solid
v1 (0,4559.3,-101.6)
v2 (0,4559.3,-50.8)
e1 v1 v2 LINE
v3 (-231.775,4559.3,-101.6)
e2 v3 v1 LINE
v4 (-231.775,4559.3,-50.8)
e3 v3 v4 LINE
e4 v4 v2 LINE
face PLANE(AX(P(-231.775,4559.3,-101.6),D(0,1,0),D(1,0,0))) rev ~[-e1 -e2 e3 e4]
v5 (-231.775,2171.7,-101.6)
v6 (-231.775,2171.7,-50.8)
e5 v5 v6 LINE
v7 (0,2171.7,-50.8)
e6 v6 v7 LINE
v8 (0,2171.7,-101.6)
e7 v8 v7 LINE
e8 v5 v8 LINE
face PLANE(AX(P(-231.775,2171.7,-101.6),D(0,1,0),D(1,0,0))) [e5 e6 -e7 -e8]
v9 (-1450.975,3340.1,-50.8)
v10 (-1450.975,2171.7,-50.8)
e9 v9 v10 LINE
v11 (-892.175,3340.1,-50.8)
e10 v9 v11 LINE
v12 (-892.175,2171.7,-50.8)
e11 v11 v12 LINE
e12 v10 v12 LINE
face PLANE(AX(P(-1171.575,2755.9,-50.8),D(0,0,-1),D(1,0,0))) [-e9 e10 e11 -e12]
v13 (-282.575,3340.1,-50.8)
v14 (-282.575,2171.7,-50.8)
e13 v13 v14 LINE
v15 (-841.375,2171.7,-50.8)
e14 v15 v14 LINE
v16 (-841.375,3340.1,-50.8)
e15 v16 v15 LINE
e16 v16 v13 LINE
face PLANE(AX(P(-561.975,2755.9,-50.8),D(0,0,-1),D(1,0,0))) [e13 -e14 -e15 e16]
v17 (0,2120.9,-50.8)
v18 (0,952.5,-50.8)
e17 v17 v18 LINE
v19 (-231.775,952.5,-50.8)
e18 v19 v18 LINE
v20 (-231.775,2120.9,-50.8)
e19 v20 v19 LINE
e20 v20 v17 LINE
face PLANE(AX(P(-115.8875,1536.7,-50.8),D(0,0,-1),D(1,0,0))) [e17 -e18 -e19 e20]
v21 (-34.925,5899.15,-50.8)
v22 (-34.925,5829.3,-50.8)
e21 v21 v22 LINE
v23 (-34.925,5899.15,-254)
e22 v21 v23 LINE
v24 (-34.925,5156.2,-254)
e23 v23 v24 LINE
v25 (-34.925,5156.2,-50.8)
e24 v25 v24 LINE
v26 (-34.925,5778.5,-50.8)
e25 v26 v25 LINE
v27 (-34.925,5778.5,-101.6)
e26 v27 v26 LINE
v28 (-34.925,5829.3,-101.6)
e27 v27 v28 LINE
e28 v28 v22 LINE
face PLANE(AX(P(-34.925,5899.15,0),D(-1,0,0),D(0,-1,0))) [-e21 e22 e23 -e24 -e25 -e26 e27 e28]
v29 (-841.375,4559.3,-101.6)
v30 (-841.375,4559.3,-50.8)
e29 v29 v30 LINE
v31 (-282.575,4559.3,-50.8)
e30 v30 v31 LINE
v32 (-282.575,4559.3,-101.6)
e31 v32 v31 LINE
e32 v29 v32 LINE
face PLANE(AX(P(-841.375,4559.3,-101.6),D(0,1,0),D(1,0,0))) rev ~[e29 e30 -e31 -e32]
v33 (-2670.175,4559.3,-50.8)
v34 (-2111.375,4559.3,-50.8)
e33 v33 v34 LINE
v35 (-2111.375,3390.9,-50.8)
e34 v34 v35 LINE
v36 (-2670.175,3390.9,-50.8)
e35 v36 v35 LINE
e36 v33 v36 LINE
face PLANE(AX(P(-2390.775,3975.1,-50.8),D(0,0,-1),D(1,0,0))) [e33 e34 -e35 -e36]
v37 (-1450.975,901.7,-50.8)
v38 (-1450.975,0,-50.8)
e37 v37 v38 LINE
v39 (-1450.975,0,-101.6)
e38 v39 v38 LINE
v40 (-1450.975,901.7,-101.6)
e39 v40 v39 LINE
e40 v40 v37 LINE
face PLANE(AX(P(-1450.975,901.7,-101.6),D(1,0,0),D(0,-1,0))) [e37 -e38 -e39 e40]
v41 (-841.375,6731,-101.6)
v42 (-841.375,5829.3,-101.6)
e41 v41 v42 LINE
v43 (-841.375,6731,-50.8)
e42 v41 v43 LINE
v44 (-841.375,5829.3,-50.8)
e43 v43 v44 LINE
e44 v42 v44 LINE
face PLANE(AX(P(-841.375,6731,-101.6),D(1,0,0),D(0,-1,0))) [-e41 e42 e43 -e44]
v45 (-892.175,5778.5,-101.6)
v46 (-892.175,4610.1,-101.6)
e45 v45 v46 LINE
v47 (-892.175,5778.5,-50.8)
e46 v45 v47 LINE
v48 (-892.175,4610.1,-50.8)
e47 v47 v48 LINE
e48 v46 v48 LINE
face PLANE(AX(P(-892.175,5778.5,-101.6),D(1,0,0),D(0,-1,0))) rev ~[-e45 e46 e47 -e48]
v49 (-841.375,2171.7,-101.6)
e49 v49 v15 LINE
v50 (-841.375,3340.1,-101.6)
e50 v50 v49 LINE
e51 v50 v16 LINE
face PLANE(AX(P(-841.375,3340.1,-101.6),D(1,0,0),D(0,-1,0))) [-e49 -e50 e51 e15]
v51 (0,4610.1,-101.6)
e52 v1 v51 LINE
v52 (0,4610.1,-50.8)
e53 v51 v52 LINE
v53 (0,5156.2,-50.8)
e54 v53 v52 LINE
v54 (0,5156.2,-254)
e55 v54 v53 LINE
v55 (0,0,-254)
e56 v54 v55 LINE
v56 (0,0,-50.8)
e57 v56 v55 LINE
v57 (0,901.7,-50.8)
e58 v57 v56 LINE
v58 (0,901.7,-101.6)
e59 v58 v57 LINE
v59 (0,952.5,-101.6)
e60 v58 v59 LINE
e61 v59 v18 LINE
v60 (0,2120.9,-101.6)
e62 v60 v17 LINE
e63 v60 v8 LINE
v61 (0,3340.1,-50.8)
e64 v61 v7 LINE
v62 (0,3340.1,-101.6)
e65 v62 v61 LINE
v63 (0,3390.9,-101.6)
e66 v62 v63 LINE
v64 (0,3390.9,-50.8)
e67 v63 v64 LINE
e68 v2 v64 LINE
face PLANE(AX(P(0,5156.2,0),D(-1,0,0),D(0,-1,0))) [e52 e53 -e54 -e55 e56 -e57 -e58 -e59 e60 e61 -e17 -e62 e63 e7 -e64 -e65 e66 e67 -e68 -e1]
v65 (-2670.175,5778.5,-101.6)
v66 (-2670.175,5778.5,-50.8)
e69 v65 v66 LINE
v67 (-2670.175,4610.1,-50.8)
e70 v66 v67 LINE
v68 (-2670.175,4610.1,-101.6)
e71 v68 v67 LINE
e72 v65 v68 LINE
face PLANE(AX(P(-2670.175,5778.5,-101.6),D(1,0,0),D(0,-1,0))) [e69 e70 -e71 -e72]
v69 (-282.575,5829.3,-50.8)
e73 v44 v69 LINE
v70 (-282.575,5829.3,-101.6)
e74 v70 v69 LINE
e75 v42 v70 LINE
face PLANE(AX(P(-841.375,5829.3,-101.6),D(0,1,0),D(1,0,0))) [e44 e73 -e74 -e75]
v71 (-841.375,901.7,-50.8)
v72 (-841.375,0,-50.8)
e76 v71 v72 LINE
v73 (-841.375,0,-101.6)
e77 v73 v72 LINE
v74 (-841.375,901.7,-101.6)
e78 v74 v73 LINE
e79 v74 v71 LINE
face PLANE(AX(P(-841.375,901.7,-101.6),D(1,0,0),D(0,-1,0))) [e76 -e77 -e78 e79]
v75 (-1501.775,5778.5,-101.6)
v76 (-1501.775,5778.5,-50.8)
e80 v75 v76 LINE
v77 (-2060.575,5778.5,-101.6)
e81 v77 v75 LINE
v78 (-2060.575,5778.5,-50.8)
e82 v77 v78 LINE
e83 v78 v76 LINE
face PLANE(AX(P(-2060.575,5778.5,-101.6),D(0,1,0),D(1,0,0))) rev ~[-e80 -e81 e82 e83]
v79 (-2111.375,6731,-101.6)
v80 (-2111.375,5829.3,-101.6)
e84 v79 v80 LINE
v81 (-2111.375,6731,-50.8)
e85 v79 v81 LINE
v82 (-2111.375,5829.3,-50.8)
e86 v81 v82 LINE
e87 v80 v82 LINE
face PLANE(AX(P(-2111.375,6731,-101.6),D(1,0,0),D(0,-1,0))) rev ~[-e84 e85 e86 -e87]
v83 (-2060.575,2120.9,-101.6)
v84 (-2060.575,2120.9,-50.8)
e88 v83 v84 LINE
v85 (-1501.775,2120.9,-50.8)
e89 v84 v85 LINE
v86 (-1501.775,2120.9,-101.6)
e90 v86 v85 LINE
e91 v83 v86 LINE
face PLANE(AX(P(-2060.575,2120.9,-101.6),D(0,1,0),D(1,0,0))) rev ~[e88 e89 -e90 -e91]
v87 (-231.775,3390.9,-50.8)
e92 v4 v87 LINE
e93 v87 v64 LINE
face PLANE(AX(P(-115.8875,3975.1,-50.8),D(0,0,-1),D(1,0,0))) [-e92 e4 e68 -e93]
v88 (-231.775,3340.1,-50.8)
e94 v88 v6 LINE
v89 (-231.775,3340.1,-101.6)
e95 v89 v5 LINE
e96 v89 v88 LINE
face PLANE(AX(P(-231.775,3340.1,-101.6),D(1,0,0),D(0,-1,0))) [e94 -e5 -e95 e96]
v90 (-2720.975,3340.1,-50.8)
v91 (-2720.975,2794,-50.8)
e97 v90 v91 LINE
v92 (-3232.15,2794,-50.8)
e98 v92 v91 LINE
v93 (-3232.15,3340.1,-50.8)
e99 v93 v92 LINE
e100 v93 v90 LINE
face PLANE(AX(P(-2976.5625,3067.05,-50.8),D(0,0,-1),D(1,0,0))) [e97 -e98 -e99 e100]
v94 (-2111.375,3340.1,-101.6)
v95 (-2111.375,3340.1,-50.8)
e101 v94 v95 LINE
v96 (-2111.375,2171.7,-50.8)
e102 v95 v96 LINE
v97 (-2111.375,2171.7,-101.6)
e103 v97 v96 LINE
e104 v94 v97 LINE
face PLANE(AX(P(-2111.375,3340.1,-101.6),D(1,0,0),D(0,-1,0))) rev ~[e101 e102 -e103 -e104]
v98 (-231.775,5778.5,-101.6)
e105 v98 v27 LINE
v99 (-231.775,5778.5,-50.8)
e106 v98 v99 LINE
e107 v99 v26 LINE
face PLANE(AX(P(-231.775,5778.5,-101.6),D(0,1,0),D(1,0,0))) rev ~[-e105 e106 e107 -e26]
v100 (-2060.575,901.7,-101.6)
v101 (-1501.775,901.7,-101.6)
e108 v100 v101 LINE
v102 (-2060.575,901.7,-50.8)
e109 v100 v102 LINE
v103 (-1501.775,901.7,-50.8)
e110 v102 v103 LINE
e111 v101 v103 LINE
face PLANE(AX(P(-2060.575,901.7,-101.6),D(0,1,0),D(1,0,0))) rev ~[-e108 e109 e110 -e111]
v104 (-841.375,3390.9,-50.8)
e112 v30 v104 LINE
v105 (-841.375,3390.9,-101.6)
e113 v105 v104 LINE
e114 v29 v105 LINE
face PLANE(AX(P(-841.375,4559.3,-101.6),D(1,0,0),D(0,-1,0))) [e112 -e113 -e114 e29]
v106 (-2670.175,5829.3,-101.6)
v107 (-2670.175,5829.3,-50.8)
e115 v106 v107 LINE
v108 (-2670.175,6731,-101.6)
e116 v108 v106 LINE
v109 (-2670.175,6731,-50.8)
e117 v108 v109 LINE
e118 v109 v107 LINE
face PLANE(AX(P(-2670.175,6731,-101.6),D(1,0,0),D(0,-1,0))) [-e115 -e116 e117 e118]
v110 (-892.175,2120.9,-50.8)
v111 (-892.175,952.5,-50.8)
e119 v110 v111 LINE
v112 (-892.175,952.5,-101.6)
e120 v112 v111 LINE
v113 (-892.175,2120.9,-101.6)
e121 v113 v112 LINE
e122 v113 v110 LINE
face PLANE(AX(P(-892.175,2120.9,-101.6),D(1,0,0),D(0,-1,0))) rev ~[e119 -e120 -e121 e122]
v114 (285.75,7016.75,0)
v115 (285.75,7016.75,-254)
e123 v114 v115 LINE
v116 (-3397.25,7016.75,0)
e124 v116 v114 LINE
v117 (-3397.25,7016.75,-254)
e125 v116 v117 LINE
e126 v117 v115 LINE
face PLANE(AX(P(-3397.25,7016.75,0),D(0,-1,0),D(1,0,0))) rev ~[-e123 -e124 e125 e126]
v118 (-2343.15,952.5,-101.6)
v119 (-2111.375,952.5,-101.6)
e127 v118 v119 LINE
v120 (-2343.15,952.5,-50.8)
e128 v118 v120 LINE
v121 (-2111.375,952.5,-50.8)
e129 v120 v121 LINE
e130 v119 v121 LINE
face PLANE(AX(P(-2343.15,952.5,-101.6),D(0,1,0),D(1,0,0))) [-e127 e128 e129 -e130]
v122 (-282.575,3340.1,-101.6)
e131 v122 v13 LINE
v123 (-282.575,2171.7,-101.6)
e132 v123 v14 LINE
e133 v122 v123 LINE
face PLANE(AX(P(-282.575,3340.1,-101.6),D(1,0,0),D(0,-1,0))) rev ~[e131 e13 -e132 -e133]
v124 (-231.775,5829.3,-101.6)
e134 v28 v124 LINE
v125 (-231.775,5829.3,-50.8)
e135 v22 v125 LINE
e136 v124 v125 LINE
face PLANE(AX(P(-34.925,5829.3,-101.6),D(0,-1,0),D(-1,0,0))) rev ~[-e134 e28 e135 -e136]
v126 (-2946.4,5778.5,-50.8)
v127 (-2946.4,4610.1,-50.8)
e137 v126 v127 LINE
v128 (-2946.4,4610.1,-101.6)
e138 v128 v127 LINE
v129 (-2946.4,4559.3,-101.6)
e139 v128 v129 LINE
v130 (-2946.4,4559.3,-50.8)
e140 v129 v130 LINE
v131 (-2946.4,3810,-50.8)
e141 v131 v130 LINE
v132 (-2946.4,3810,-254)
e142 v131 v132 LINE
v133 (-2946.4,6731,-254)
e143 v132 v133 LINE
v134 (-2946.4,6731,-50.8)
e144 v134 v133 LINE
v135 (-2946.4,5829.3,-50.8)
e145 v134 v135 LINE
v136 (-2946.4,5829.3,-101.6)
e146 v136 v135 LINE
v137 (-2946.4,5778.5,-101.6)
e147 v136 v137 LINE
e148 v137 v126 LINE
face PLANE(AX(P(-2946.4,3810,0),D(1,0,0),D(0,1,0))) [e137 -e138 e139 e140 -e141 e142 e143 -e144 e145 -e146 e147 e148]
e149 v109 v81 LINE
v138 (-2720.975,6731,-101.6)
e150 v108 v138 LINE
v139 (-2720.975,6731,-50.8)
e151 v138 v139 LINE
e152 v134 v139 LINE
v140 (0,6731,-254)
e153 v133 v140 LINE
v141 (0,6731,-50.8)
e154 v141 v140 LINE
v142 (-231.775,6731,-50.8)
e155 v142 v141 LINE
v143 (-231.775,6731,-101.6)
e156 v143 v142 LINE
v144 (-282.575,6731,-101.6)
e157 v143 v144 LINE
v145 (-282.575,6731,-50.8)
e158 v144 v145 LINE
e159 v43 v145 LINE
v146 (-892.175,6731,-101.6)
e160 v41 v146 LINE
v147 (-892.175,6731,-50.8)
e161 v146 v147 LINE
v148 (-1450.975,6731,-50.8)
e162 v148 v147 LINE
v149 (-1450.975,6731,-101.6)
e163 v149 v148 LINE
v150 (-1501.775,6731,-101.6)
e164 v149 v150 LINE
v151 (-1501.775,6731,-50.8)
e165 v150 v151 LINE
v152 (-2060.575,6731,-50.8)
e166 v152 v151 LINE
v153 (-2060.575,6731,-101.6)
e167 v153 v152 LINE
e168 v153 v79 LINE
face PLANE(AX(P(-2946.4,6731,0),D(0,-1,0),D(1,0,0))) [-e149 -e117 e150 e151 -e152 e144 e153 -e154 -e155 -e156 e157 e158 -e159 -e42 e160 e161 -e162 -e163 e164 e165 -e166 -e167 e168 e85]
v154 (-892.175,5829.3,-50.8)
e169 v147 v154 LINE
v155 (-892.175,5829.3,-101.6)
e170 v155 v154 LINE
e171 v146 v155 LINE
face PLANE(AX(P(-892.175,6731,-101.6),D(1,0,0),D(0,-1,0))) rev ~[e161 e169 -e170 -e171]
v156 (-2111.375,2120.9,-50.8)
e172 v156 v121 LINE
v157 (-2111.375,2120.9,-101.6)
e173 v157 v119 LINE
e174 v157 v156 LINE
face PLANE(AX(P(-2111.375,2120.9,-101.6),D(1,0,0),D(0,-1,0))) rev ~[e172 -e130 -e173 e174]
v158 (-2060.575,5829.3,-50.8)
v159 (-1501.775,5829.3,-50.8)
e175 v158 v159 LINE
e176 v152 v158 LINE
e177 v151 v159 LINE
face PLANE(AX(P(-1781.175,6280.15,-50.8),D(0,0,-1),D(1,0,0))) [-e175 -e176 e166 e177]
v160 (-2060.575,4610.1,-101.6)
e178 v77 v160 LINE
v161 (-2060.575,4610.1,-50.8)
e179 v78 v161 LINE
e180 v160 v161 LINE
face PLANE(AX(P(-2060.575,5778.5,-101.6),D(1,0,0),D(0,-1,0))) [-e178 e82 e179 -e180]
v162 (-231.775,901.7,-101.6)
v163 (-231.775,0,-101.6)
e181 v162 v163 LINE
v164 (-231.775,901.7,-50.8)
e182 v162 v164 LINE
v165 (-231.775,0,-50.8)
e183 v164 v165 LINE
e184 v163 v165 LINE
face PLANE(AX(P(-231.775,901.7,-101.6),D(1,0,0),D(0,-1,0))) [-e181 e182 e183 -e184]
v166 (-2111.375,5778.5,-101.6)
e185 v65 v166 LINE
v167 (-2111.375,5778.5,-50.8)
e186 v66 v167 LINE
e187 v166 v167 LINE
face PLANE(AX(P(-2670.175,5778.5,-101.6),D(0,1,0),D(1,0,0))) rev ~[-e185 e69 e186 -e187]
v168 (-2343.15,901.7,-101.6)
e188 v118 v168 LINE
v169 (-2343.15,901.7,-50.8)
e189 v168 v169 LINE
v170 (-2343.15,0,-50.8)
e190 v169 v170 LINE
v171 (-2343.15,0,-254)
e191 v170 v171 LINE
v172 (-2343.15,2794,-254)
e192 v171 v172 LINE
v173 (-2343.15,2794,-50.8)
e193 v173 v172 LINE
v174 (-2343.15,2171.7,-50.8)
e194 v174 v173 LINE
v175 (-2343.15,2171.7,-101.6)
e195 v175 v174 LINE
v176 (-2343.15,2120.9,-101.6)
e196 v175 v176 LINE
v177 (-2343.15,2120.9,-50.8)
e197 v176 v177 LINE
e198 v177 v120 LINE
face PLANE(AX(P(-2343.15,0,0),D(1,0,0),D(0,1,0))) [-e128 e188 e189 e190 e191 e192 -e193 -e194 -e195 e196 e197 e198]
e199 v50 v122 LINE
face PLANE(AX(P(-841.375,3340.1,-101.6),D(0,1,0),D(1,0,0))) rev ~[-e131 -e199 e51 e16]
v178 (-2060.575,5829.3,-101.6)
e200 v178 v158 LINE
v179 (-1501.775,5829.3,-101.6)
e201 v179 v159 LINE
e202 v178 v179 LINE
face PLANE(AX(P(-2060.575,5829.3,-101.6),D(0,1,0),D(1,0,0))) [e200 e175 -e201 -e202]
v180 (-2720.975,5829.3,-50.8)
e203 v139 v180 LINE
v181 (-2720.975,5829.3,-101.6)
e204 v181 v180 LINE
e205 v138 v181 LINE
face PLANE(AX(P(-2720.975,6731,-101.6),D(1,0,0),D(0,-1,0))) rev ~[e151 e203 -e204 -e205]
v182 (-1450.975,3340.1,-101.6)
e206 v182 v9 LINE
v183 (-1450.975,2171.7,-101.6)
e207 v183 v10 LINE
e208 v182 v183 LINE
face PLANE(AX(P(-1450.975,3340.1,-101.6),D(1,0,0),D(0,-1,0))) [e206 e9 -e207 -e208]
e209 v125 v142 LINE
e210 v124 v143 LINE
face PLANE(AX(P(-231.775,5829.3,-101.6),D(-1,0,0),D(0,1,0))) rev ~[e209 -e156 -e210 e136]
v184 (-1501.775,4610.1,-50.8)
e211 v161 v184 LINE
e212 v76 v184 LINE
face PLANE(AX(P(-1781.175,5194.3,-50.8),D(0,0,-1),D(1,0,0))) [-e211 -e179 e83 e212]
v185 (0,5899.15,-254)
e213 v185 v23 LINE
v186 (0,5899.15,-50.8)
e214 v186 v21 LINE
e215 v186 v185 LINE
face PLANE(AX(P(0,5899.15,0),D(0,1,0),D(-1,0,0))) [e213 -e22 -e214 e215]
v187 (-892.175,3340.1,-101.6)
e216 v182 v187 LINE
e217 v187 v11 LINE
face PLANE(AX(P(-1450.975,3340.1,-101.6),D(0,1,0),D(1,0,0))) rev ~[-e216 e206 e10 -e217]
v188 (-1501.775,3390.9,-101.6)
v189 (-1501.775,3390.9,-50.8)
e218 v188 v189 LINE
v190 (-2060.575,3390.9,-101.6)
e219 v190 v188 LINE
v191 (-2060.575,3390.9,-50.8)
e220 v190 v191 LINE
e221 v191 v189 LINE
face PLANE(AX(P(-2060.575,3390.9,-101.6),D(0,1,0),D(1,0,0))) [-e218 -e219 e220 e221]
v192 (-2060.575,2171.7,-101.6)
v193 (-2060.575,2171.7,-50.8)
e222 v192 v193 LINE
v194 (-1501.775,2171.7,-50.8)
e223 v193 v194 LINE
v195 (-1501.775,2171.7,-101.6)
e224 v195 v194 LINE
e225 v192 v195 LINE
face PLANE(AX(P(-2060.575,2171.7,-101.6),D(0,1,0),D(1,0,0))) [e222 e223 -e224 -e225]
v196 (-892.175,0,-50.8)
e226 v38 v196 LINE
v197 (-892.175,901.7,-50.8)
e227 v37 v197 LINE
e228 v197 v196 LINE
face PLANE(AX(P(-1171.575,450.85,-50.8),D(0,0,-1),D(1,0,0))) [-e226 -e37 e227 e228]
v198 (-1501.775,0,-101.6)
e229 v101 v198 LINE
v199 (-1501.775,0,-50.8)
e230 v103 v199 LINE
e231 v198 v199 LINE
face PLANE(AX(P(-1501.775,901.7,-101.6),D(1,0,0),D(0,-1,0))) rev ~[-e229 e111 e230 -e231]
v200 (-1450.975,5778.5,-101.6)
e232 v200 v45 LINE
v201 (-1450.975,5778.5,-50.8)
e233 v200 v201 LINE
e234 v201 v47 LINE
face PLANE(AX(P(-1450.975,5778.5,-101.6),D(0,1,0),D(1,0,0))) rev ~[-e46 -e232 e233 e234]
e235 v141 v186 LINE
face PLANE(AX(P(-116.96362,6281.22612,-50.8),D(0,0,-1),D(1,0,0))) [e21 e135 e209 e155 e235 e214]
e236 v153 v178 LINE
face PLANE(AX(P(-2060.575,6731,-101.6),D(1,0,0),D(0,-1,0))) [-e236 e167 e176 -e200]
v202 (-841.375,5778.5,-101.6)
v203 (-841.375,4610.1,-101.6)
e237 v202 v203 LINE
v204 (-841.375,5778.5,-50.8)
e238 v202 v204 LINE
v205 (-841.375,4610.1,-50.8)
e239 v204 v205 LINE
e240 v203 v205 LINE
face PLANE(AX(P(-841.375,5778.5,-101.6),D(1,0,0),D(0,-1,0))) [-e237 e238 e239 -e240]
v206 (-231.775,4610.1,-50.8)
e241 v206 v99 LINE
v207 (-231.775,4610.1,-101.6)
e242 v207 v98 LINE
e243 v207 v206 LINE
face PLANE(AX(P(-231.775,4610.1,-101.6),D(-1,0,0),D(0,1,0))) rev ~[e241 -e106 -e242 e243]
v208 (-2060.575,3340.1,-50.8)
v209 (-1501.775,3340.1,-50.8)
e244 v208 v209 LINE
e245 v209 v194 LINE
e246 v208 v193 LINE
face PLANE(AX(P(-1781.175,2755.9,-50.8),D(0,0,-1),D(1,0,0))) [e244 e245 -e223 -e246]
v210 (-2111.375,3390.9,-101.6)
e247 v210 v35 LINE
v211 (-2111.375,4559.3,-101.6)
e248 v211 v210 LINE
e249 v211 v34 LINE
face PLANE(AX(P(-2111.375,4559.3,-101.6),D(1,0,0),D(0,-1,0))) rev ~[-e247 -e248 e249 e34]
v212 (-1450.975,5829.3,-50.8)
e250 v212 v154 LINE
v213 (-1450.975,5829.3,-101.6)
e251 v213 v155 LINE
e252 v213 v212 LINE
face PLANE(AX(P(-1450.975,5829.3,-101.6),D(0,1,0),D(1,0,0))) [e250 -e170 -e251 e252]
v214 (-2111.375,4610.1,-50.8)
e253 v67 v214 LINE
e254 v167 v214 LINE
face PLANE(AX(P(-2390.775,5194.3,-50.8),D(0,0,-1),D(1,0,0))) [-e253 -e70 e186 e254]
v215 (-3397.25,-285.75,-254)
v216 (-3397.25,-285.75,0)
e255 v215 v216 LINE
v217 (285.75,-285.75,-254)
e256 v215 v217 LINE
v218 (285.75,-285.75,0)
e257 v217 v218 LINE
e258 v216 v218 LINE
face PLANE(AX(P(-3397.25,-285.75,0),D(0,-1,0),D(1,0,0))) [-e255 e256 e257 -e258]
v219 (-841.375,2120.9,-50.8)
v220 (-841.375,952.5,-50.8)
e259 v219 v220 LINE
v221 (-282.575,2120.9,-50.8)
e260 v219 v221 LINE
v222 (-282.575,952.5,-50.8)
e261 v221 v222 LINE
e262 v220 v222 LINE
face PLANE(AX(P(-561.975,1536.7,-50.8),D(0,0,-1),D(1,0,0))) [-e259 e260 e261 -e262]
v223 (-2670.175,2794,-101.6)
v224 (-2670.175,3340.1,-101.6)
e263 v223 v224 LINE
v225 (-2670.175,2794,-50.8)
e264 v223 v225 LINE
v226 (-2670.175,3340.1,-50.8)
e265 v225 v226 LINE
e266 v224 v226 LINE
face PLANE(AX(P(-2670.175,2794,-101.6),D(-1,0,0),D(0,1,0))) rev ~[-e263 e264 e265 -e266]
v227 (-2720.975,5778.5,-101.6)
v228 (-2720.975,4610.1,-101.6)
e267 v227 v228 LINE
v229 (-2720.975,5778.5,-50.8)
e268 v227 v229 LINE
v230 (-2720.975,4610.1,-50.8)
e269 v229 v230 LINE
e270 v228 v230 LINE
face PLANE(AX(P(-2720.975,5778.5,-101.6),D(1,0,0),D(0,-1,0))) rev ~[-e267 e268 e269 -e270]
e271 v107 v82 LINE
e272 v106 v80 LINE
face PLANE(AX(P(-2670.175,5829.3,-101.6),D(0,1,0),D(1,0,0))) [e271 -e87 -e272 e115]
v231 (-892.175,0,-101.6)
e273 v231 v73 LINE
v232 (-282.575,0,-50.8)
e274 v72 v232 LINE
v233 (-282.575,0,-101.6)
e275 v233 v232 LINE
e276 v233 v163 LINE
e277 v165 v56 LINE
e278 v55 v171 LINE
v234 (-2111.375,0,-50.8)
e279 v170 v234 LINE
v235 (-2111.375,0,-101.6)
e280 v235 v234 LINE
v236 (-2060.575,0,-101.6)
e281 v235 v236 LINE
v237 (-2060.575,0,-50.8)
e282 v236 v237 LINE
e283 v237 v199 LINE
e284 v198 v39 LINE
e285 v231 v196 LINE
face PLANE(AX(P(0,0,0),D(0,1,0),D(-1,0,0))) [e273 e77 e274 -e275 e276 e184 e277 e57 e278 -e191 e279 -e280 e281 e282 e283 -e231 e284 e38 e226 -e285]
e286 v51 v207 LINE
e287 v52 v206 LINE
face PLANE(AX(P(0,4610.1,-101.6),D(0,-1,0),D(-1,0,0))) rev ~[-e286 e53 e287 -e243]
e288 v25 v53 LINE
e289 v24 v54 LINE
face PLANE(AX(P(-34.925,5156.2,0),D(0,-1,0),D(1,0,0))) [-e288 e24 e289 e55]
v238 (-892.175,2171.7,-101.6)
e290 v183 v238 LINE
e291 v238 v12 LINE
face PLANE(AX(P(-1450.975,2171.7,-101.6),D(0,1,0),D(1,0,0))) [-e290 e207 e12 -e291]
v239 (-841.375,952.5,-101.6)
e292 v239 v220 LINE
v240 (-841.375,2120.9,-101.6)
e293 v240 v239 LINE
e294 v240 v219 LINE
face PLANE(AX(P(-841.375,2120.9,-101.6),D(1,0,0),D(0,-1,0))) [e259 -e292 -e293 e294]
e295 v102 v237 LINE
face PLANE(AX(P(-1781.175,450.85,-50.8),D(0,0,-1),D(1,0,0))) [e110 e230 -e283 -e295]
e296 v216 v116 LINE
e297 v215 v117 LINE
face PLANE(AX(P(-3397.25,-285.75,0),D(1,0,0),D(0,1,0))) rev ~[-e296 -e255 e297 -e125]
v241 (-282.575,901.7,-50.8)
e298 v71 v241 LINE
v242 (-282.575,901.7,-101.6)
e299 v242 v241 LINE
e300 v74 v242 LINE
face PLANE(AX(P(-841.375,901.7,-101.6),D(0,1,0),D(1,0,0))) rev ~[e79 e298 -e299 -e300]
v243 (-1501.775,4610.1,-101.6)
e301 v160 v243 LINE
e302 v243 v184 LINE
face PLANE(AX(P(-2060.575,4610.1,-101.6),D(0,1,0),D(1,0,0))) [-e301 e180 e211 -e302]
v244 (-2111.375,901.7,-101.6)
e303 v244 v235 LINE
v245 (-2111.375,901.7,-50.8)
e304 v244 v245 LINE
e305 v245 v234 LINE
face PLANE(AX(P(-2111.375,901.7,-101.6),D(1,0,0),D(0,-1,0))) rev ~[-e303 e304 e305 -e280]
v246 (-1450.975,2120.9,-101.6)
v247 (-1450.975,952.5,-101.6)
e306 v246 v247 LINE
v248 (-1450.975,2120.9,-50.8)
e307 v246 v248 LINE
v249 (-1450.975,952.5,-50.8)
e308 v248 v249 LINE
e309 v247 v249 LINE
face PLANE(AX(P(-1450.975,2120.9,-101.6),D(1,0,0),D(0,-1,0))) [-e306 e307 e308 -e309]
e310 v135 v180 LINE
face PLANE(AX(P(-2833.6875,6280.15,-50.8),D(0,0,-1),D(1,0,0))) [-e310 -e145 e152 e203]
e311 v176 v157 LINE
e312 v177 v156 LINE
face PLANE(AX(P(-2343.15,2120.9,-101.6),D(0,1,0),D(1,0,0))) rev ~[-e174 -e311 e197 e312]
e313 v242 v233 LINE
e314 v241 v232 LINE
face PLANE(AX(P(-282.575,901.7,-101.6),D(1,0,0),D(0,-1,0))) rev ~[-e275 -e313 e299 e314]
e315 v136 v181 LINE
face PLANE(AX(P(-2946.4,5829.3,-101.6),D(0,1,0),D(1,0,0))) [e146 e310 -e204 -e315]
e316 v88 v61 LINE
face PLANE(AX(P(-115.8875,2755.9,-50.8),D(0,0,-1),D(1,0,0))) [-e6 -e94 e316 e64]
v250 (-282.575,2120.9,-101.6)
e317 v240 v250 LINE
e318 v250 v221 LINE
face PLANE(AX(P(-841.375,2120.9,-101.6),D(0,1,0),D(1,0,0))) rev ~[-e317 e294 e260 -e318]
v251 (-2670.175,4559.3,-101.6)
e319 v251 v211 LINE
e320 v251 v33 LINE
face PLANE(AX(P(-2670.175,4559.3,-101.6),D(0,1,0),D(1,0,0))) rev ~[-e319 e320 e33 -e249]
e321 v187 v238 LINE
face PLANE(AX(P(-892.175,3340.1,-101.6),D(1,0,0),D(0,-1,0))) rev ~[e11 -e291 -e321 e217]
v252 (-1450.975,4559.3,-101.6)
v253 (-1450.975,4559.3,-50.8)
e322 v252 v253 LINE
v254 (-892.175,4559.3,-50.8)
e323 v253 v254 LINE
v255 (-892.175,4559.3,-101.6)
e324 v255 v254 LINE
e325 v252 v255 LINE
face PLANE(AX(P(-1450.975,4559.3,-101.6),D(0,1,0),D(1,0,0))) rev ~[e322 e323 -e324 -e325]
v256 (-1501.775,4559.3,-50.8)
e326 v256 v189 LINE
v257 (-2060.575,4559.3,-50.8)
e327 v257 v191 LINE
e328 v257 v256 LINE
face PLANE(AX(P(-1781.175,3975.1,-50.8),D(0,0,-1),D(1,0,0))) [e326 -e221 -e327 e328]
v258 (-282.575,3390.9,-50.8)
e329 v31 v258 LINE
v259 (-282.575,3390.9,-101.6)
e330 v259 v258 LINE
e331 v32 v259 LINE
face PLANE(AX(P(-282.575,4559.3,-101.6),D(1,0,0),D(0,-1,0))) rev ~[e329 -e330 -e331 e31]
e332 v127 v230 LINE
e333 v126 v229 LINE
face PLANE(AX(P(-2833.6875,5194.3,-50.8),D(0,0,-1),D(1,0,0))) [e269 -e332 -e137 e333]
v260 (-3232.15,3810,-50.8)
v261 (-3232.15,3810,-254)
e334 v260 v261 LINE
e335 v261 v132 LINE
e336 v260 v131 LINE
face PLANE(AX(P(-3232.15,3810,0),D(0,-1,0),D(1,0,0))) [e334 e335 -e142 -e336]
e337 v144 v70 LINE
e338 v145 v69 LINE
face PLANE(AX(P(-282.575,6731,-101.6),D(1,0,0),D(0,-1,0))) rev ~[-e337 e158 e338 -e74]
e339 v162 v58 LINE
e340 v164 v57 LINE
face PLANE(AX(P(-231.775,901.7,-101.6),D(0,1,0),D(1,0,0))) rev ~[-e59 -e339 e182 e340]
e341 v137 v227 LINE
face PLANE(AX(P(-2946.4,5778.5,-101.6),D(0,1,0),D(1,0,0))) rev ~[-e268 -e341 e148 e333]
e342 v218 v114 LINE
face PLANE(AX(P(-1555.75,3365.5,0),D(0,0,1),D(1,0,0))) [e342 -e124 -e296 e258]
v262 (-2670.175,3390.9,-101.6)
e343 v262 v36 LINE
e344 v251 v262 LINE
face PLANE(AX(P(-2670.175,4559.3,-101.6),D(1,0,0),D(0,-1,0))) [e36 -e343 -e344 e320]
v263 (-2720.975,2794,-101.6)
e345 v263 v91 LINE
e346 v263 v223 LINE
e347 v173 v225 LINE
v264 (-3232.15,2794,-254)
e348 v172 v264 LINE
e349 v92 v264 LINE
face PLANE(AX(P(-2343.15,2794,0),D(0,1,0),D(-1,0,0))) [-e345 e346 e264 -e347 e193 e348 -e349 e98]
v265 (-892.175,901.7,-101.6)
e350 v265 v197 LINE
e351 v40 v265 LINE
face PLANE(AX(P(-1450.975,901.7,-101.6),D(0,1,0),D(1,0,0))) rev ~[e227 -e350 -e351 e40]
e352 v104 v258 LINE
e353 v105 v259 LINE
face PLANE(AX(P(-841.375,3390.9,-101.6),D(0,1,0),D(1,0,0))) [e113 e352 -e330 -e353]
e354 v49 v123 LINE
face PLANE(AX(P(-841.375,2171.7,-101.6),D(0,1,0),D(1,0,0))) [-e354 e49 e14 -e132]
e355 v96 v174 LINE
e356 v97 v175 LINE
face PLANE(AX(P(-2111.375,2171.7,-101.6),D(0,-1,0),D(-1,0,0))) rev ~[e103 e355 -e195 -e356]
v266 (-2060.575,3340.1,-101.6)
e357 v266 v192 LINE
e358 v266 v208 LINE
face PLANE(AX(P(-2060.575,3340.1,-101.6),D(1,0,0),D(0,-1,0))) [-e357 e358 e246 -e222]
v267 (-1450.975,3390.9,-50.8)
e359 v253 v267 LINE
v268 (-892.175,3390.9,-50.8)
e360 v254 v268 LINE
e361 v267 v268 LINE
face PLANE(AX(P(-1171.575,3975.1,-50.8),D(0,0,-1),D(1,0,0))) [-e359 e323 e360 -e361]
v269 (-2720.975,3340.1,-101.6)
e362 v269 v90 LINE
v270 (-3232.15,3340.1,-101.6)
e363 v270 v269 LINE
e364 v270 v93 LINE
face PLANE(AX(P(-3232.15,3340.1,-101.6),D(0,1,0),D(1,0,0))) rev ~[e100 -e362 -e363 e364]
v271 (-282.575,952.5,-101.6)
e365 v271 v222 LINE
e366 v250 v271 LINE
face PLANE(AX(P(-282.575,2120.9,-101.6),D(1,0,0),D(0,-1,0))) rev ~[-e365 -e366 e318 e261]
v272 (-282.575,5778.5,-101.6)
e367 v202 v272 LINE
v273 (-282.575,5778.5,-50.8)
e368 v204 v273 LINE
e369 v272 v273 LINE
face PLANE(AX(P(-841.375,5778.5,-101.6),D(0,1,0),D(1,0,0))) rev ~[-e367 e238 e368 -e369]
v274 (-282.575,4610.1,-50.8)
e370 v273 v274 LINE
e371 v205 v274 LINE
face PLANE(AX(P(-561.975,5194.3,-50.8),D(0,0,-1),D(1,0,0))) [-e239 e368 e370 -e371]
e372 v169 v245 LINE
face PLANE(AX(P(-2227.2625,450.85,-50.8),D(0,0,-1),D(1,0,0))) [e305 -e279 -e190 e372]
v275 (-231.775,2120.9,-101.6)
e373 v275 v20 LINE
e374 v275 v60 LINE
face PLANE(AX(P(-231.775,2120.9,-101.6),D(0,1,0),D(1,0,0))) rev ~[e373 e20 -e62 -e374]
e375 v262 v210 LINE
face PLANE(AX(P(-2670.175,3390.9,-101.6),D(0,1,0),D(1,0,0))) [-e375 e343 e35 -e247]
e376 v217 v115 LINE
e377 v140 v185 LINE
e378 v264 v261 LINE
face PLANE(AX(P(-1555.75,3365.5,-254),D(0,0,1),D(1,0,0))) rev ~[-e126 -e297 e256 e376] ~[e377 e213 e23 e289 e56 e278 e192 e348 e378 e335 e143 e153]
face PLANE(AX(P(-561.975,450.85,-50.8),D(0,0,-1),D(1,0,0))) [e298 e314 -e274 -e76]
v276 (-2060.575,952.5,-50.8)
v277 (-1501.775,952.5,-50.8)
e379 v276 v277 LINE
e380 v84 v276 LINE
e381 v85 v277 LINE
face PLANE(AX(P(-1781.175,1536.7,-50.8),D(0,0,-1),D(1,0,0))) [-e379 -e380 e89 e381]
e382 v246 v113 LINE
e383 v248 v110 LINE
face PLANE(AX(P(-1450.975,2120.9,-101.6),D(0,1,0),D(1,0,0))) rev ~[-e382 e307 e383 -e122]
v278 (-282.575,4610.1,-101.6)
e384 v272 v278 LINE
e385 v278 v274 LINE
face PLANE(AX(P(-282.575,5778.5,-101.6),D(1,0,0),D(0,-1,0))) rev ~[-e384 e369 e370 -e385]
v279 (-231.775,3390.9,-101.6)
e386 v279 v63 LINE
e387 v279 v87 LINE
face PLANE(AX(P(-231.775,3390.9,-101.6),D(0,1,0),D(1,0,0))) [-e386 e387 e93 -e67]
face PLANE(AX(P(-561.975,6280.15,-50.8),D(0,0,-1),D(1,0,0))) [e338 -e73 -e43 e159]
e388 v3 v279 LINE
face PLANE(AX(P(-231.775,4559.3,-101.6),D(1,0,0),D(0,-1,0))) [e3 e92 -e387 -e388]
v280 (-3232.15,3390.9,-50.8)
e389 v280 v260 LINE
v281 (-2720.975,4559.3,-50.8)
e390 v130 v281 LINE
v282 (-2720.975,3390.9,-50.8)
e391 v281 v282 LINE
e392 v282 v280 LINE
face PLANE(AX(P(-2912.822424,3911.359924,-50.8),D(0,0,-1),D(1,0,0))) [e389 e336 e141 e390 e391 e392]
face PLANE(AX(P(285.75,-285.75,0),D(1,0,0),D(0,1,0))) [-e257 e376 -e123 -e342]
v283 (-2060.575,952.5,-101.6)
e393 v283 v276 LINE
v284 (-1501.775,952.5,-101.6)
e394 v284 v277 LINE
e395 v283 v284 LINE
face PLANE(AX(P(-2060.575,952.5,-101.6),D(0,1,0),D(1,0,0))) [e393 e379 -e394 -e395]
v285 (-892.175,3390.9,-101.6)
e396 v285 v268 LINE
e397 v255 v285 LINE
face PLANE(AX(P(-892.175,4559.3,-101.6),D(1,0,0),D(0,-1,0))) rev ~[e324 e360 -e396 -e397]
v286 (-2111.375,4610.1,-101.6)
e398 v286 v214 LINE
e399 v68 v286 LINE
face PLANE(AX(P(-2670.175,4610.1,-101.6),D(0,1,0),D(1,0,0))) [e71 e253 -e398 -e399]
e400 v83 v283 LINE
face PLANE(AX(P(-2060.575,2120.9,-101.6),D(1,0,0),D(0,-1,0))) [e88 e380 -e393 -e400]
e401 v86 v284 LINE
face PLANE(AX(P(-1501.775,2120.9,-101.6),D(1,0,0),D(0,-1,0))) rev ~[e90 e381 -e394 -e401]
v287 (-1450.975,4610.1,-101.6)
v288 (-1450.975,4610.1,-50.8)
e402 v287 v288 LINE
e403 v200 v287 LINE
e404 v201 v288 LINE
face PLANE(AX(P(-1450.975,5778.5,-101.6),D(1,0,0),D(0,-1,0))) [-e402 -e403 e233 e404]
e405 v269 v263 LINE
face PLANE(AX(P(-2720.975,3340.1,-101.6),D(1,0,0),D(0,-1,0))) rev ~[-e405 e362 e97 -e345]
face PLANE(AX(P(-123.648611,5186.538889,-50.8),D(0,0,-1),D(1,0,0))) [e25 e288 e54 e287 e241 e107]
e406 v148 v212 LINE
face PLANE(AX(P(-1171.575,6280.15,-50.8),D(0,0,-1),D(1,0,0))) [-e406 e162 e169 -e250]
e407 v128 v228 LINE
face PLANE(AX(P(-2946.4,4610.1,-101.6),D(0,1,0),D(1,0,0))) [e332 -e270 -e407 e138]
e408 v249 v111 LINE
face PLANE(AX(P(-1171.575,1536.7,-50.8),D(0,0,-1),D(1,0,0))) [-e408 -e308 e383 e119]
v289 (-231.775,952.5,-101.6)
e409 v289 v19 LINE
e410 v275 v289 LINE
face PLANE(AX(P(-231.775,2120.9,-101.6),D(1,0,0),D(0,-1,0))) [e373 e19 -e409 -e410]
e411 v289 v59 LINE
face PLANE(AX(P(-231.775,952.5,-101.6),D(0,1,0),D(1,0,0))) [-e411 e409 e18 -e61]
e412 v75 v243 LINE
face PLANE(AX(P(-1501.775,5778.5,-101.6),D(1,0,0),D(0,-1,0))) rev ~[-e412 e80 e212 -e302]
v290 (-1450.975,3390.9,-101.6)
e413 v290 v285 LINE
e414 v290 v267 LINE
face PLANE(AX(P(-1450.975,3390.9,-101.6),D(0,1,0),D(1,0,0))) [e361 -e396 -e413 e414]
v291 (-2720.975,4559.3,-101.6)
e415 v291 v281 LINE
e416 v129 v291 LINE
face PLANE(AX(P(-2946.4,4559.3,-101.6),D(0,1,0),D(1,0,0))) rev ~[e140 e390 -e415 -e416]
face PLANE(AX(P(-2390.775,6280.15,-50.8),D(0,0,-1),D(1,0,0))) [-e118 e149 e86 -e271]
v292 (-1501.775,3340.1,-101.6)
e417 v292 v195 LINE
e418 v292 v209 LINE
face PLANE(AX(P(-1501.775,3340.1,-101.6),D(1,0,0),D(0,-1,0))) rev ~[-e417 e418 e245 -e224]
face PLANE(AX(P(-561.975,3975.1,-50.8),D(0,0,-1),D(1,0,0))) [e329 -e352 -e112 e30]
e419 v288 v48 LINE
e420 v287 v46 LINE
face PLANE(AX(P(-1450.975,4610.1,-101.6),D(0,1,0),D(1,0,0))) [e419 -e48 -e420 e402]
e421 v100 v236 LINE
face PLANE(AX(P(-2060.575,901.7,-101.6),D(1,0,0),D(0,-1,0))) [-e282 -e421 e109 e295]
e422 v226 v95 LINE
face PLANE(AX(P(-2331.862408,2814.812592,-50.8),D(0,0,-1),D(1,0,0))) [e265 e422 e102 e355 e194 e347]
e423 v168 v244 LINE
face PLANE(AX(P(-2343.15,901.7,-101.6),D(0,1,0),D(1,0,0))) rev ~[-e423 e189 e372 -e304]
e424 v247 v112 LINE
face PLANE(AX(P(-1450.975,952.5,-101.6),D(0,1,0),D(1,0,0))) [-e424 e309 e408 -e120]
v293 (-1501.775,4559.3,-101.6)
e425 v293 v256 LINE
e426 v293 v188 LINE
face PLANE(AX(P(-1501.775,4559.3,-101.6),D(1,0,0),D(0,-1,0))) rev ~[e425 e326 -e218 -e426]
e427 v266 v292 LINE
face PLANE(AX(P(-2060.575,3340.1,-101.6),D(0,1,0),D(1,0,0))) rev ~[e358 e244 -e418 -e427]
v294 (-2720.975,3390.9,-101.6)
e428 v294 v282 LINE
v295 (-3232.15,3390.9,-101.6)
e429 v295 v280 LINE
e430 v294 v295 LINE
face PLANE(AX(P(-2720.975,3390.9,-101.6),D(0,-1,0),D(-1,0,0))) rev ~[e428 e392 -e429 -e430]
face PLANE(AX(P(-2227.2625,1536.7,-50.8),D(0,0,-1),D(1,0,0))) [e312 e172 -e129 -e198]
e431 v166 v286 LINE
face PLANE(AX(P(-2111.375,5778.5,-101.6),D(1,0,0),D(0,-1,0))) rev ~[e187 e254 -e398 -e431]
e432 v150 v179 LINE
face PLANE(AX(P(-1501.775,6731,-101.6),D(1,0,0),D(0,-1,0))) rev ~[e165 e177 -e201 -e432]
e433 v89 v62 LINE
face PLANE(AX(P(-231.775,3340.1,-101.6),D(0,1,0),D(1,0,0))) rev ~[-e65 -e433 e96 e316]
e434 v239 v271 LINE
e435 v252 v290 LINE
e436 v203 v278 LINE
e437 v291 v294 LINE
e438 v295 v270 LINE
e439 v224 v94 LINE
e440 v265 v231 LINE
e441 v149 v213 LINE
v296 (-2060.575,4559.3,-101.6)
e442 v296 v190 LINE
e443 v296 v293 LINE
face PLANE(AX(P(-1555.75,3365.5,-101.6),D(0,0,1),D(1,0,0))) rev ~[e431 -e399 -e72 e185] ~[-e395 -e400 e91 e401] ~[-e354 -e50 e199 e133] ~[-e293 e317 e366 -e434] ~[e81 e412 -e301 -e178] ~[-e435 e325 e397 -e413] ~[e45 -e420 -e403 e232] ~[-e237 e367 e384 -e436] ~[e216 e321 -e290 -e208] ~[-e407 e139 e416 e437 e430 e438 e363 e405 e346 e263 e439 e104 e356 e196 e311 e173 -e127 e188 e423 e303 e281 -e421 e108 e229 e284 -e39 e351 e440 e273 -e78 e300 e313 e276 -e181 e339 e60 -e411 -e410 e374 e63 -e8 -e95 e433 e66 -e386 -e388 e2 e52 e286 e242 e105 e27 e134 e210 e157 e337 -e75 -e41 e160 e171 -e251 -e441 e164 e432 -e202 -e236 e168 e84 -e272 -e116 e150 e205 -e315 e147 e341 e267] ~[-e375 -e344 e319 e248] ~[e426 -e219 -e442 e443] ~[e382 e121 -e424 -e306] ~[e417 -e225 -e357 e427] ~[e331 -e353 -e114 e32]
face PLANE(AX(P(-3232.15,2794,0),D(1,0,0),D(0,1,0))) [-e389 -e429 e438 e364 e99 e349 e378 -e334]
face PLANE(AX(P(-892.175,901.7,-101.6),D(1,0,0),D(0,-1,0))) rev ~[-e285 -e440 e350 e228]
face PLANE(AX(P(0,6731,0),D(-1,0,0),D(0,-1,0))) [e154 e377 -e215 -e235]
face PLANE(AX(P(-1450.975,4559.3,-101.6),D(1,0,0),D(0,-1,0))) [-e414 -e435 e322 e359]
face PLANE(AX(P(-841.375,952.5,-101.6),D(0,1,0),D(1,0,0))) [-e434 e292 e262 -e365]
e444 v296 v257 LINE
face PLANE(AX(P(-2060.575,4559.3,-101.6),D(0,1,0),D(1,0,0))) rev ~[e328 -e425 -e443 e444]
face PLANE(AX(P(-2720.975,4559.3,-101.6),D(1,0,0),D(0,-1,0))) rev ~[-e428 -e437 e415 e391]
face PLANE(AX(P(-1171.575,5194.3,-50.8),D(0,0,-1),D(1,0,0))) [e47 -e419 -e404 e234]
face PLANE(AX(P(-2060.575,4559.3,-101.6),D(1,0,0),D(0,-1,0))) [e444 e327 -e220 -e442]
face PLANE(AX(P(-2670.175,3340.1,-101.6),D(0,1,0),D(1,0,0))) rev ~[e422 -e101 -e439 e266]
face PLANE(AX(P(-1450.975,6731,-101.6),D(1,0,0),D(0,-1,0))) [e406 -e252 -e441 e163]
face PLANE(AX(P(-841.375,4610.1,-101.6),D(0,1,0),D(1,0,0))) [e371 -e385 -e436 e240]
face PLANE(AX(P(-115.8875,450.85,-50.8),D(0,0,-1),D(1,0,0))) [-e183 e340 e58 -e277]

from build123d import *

# Parameters (mm, degrees)
F0_W     = 3683
F0_H     = 7302.5
F1_DEPTH = 254
F2_DEPTH = 101.6
F3_W     = 558.8
F3_H     = 901.7
F3_W_2   = 231.775
F3_H_2   = 1168.4
F3_W_3   = 511.175
F3_H_3   = 546.1
F3_W_4   = 225.425
F4_DEPTH = 50.8


# Not quite as in the source:
# - a feature names something its author has since deleted; it is built from what else it names


with BuildPart() as f1:
    # F0 (on Top) → F1 (new body)
    with BuildSketch(Plane.XY):
        with Locations((-1555.75, 3365.5)):
            Rectangle(F0_W, F0_H)
        Polygon((0, 5156.2), (0, 0), (-2343.15, 0), (-2343.15, 2794), (-3232.15, 2794), (-3232.15, 3810), (-2946.4, 3810), (-2946.4, 6731), (0, 6731), (0, 5899.15), (-34.925, 5899.15), (-34.925, 5156.2), align=None, mode=Mode.SUBTRACT)
    extrude(amount=-F1_DEPTH)

    # F0 (on Top) → F2 (join)
    with BuildSketch(Plane.XY):
        with Locations((-1555.75, 3365.5)):
            Rectangle(F0_W, F0_H)
        Polygon((0, 5156.2), (0, 0), (-2343.15, 0), (-2343.15, 2794), (-3232.15, 2794), (-3232.15, 3810), (-2946.4, 3810), (-2946.4, 6731), (0, 6731), (0, 5899.15), (-34.925, 5899.15), (-34.925, 5156.2), align=None, mode=Mode.SUBTRACT)
        Polygon((-2343.15, 0), (0, 0), (0, 5156.2), (-34.925, 5156.2), (-34.925, 5899.15), (0, 5899.15), (0, 6731), (-2946.4, 6731), (-2946.4, 3810), (-3232.15, 3810), (-3232.15, 2794), (-2343.15, 2794), align=None)
    extrude(amount=-F2_DEPTH)

    # F3 (on face) → F4 (cut)
    with BuildSketch(Plane(origin=(0, 0, -101.6), x_dir=(1, 0, 0), z_dir=(0, 0, -1))):
        with Locations((-1781.175, -450.85)):
            Rectangle(F3_W, F3_H)
        with Locations((-1171.575, -450.85)):
            Rectangle(F3_W, F3_H)
        with Locations((-561.975, -450.85)):
            Rectangle(F3_W, F3_H)
        with Locations((-115.8875, -450.85)):
            Rectangle(F3_W_2, F3_H)
        with Locations((-115.8875, -1536.7)):
            Rectangle(F3_W_2, F3_H_2)
        Polygon((-2111.375, -2171.7), (-2343.15, -2171.7), (-2343.15, -2794), (-2670.175, -2794), (-2670.175, -3340.1), (-2111.375, -3340.1), align=None)
        with Locations((-2976.5625, -3067.05)):
            Rectangle(F3_W_3, F3_H_3)
        with Locations((-115.8875, -3975.1)):
            Rectangle(F3_W_2, F3_H_2)
        with Locations((-2833.6875, -5194.3)):
            Rectangle(F3_W_4, F3_H_2)
        with Locations((-2227.2625, -450.85)):
            Rectangle(F3_W_2, F3_H)
        with Locations((-2227.2625, -1536.7)):
            Rectangle(F3_W_2, F3_H_2)
        with Locations((-1781.175, -1536.7)):
            Rectangle(F3_W, F3_H_2)
        with Locations((-1171.575, -1536.7)):
            Rectangle(F3_W, F3_H_2)
        with Locations((-561.975, -1536.7)):
            Rectangle(F3_W, F3_H_2)
        with Locations((-1781.175, -2755.9)):
            Rectangle(F3_W, F3_H_2)
        with Locations((-1171.575, -2755.9)):
            Rectangle(F3_W, F3_H_2)
        with Locations((-561.975, -2755.9)):
            Rectangle(F3_W, F3_H_2)
        with Locations((-115.8875, -2755.9)):
            Rectangle(F3_W_2, F3_H_2)
        Polygon((-2720.975, -3390.9), (-3232.15, -3390.9), (-3232.15, -3810), (-2946.4, -3810), (-2946.4, -4559.3), (-2720.975, -4559.3), align=None)
        with Locations((-2390.775, -3975.1)):
            Rectangle(F3_W, F3_H_2)
        with Locations((-1781.175, -3975.1)):
            Rectangle(F3_W, F3_H_2)
        with Locations((-1171.575, -3975.1)):
            Rectangle(F3_W, F3_H_2)
        with Locations((-561.975, -3975.1)):
            Rectangle(F3_W, F3_H_2)
        with Locations((-2390.775, -5194.3)):
            Rectangle(F3_W, F3_H_2)
        with Locations((-1781.175, -5194.3)):
            Rectangle(F3_W, F3_H_2)
        with Locations((-1171.575, -5194.3)):
            Rectangle(F3_W, F3_H_2)
        with Locations((-561.975, -5194.3)):
            Rectangle(F3_W, F3_H_2)
        Polygon((0, -5156.2), (0, -4610.1), (-231.775, -4610.1), (-231.775, -5778.5), (-34.925, -5778.5), (-34.925, -5156.2), align=None)
        with Locations((-2833.6875, -6280.15)):
            Rectangle(F3_W_4, F3_H)
        with Locations((-2390.775, -6280.15)):
            Rectangle(F3_W, F3_H)
        with Locations((-1781.175, -6280.15)):
            Rectangle(F3_W, F3_H)
        with Locations((-1171.575, -6280.15)):
            Rectangle(F3_W, F3_H)
        with Locations((-561.975, -6280.15)):
            Rectangle(F3_W, F3_H)
        Polygon((-34.925, -5899.15), (-34.925, -5829.3), (-231.775, -5829.3), (-231.775, -6731), (0, -6731), (0, -5899.15), align=None)
    extrude(amount=-F4_DEPTH, mode=Mode.SUBTRACT)


solid = f1.part
